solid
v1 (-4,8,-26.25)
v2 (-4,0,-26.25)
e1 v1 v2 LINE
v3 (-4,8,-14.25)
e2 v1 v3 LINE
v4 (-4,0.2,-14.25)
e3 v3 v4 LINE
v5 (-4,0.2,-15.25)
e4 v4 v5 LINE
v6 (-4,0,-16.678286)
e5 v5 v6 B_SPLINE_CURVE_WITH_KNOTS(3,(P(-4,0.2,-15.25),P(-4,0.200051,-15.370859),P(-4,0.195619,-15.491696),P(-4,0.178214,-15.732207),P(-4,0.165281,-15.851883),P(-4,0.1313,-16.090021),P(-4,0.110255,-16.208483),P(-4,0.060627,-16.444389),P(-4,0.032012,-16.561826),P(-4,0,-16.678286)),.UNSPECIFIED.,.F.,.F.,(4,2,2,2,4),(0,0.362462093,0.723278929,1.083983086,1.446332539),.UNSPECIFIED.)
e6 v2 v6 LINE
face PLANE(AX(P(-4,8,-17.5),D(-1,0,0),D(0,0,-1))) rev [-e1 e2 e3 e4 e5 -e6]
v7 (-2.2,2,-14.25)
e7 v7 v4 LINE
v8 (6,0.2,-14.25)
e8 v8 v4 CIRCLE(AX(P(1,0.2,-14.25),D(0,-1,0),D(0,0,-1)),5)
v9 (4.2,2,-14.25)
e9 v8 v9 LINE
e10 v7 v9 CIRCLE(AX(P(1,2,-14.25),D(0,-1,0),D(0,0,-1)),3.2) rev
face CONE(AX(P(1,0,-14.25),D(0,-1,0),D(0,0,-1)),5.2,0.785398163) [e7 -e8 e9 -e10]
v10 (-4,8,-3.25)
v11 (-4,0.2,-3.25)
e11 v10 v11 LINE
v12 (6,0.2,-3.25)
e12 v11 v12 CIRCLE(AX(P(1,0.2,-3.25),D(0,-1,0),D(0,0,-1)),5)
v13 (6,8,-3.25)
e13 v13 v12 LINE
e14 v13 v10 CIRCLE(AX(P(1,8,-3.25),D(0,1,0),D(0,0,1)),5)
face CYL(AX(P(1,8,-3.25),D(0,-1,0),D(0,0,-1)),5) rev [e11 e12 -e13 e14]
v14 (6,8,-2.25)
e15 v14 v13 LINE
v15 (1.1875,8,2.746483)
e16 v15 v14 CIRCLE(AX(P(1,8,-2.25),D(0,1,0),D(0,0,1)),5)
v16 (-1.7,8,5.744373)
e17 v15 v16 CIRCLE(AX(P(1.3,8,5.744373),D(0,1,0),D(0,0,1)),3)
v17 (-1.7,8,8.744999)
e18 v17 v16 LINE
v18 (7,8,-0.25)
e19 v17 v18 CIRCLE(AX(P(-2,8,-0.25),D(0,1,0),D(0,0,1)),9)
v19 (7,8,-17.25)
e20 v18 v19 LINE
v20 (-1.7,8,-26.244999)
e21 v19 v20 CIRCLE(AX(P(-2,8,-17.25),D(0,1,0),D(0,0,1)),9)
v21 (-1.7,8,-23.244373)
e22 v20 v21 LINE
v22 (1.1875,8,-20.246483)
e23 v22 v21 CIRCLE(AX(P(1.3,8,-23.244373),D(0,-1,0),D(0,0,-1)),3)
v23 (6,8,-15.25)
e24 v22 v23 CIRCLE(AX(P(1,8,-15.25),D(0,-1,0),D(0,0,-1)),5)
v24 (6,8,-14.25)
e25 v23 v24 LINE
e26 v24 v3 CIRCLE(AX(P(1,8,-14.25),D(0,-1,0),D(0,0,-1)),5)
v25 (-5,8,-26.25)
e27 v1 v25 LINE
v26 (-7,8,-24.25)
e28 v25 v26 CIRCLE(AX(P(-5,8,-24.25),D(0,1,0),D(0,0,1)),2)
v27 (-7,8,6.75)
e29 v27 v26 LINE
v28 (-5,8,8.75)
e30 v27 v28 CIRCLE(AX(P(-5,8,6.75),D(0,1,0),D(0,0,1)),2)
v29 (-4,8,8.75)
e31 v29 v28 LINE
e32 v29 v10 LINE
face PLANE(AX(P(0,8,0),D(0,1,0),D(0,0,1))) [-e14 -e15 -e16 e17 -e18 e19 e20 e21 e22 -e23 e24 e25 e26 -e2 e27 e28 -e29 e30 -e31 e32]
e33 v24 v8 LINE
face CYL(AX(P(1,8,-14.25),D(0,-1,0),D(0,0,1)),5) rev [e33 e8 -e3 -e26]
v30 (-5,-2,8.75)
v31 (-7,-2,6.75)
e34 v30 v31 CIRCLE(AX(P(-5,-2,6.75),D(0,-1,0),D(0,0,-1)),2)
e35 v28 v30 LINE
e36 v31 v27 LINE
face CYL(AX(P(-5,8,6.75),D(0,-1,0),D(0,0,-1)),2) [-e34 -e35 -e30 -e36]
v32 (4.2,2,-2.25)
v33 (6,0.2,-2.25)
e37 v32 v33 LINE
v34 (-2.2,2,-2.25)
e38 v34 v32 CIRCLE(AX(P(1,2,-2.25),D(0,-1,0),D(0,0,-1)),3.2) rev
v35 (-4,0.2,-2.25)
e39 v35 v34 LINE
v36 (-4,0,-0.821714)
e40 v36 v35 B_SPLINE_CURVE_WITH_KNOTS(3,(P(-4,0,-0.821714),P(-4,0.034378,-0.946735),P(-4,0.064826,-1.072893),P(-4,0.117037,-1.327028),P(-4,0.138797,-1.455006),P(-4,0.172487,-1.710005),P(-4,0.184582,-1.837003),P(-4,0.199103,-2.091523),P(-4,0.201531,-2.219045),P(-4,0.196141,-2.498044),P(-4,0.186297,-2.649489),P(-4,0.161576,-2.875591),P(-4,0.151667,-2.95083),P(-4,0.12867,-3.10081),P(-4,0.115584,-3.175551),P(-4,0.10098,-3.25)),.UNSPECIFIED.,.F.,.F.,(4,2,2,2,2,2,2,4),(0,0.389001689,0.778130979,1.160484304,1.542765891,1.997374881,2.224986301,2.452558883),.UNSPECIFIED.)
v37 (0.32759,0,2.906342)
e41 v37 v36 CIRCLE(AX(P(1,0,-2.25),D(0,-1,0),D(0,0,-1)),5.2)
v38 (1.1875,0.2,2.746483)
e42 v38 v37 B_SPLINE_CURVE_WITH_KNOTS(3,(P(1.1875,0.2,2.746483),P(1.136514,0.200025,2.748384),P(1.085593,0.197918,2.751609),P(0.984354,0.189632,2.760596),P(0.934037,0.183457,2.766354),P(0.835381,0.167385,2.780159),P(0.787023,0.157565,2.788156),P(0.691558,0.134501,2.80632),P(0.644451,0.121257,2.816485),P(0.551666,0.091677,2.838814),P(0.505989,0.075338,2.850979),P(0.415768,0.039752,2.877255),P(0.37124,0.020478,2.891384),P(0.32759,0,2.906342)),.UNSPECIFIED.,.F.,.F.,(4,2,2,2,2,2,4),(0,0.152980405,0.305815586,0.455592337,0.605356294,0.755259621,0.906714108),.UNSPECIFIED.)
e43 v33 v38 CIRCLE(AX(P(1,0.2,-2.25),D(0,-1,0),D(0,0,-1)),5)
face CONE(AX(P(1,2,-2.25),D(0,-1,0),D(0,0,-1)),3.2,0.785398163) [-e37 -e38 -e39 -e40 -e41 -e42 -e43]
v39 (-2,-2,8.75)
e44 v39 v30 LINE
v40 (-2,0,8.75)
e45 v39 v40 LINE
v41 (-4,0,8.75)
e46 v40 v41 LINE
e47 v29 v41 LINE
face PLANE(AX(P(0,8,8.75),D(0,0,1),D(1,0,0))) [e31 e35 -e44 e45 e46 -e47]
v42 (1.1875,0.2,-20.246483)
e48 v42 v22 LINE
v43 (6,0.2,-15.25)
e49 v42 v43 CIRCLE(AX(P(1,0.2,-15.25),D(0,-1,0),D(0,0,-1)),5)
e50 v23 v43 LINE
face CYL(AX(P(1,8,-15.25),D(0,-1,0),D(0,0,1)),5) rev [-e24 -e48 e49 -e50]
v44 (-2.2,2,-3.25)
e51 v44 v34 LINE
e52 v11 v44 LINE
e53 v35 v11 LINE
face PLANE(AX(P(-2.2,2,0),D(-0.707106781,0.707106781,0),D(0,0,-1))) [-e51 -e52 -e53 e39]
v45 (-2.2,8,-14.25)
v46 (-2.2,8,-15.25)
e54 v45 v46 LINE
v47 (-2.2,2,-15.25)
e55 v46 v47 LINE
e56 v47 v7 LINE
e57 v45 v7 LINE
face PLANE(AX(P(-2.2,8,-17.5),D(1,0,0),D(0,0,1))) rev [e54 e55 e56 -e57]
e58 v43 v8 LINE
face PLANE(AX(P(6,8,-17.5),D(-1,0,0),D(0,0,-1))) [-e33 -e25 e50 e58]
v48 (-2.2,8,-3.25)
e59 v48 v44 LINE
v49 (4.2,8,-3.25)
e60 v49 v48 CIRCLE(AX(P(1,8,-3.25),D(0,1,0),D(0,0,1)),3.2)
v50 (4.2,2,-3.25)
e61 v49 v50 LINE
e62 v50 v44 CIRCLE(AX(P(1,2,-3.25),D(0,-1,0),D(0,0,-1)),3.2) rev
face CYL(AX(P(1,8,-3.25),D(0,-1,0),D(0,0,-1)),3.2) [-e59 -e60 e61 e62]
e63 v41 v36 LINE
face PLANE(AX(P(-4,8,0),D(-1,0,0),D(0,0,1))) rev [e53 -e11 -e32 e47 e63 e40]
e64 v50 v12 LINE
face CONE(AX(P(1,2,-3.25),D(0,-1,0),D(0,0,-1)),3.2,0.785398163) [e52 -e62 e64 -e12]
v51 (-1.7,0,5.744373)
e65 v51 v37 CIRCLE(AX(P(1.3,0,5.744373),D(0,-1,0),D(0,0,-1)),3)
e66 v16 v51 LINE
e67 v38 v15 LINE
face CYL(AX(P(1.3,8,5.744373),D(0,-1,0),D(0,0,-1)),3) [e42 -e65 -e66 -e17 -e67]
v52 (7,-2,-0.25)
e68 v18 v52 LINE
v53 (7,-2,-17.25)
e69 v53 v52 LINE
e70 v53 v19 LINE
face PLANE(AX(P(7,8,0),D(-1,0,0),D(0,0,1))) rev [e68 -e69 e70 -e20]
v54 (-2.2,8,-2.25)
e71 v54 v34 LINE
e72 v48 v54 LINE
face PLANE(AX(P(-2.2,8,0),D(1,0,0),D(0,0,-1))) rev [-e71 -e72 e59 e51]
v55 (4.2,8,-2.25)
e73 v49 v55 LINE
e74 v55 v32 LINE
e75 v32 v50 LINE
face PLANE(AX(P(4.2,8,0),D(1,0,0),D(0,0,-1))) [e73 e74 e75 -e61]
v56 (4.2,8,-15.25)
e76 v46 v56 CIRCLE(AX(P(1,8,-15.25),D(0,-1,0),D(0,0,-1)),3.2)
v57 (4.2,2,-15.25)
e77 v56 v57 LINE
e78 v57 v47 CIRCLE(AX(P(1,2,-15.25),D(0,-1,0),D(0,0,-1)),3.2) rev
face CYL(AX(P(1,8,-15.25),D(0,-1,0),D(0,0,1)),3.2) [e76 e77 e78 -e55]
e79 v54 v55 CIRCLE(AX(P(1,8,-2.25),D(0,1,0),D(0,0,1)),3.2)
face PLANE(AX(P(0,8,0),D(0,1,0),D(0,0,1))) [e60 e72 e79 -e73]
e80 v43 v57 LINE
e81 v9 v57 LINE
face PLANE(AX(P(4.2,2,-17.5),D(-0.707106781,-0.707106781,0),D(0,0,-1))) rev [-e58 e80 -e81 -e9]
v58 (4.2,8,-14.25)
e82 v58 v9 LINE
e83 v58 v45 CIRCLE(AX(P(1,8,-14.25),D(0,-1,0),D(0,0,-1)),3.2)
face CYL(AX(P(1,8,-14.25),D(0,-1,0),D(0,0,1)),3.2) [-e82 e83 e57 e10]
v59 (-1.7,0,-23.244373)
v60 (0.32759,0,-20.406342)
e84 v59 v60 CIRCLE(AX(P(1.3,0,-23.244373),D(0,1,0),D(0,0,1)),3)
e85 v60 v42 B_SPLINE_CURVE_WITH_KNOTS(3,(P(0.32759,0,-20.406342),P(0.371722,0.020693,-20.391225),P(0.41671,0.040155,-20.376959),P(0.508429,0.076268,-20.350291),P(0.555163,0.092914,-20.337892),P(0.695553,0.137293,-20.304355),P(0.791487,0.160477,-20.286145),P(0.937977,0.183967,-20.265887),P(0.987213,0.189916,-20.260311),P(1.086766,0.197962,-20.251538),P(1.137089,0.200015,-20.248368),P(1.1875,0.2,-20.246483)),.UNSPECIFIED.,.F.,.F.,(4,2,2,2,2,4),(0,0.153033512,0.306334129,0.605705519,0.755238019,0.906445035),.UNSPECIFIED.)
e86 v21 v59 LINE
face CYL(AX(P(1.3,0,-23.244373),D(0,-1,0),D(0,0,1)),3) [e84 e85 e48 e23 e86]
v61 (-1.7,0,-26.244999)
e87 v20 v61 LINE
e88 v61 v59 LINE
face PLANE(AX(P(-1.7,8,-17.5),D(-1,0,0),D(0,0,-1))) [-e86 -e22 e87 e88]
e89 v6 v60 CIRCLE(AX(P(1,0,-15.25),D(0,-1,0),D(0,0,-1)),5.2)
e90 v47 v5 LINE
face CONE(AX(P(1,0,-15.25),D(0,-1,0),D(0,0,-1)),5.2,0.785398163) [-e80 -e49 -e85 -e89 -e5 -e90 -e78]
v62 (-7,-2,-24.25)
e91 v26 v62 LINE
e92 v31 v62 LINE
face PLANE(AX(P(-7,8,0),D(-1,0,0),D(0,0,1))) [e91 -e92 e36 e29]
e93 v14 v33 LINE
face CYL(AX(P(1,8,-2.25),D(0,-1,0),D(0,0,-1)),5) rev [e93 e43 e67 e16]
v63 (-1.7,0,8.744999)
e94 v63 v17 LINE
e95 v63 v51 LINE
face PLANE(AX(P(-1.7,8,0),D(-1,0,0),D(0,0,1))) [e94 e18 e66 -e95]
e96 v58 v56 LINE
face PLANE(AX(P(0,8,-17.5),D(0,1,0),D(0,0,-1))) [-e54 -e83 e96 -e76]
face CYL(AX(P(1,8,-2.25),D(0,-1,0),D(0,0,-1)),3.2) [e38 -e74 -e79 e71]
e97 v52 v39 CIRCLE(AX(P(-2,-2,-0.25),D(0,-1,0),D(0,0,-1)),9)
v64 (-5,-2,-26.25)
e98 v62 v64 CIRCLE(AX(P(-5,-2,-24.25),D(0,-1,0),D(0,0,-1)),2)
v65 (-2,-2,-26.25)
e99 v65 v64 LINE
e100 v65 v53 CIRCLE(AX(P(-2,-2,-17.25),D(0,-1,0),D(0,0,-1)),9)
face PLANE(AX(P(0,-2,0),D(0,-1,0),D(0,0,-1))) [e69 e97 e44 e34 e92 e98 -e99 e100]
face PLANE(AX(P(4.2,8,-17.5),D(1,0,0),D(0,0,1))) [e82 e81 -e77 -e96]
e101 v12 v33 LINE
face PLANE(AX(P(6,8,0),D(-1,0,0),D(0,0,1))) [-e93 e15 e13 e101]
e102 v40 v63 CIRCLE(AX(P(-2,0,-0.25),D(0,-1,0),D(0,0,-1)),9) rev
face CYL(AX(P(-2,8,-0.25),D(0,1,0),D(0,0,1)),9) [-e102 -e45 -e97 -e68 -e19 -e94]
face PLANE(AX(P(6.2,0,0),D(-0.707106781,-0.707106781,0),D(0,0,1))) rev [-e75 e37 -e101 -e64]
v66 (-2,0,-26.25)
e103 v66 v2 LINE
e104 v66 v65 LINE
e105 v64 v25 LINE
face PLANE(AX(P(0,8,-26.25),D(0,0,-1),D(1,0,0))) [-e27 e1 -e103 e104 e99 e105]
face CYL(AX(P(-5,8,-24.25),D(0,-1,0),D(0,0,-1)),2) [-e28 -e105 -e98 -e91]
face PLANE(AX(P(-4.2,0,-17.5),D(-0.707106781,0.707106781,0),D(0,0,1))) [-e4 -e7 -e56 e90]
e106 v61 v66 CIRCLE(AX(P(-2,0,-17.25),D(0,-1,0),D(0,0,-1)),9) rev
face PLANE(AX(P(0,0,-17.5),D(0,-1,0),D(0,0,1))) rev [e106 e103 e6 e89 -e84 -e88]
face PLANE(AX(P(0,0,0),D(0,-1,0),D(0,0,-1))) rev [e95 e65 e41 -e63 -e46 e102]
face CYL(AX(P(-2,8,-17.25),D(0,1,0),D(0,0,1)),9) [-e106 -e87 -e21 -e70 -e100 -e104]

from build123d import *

# Parameters (mm, degrees)
BOSS_EXTRUDE3_DEPTH   = 8
BOSS_EXTRUDE3_2_DEPTH = 8
SKETCH4_W             = 14
SKETCH4_H             = 17.5
BOSS_EXTRUDE4_DEPTH   = 2
FILLET3_R             = 3
MIRROR2_START         = -2
MIRROR2_DEPTH         = 10
MIRROR2_2_DEPTH       = 2
CHAMFER1_SIZE         = 2
FILLET4_R             = 9
FILLET5_R             = 2


# Read off the part's stored shape, not the designer's step: Mirror2
with BuildPart() as part:
    # Sketch3 → Boss-Extrude3 (new body)
    with BuildSketch(Plane(origin=(0, 0, 0), x_dir=(1, 0, 0), z_dir=(0, 1, 0))):
        with BuildLine():
            Line((-1.7, -8.75), (7, -8.75))
            Line((7, -8.75), (7, 8.75))
            Line((7, 8.75), (-7, 8.75))
            Line((-7, 8.75), (-7, -8.75))
            Line((-7, -8.75), (-4, -8.75))
            Line((-4, -8.75), (-4, 3.25))
            ThreePointArc((-4, 3.25), (1, 8.25), (6, 3.25))
            Line((6, 3.25), (6, 2.25))
            ThreePointArc((6, 2.25), (3.397915762, -2.137482194), (-1.7, -1.958325083))
            Line((-1.7, -1.958325083), (-1.7, -8.75))
        make_face()
    extrude(amount=BOSS_EXTRUDE3_DEPTH)



with BuildPart() as body_2:
    # Sketch3 → Boss-Extrude3 2 (new body)
    with BuildSketch(Plane(origin=(0, 0, 0), x_dir=(1, 0, 0), z_dir=(0, 1, 0))):
        with BuildLine():
            ThreePointArc((-2.2, 2.25), (1, -0.95), (4.2, 2.25))
            Line((4.2, 2.25), (4.2, 3.25))
            ThreePointArc((4.2, 3.25), (1, 6.45), (-2.2, 3.25))
            Line((-2.2, 3.25), (-2.2, 2.25))
        make_face()
    extrude(amount=BOSS_EXTRUDE3_2_DEPTH)


with BuildPart() as part_1:
    add(part.part)

    add(body_2.part)  # Boss-Extrude4 merges body 2
    # Sketch4 → Boss-Extrude4 (add)
    with BuildSketch(Plane(origin=(0, 0, 0), x_dir=(-1, 0, 0), z_dir=(0, -1, 0))):
        Rectangle(SKETCH4_W, SKETCH4_H)
    extrude(amount=BOSS_EXTRUDE4_DEPTH)

    # Fillet3
    fillet3_edges = [part_1.edges().sort_by_distance(p)[0] for p in [
        (-1.7, 4, 1.958325083),
    ]]
    fillet(fillet3_edges, radius=FILLET3_R)

    # Mirror2 outline → Mirror2 (add)
    with BuildSketch(Plane(origin=(0, 0, 0), x_dir=(1, 0, 0), z_dir=(0, 1, 0)).offset(MIRROR2_START)):
        with BuildLine():
            ThreePointArc((1.1875, 20.246483138), (4.601215073, 18.718609231), (6, 15.25))
            Line((6, 15.25), (6, 14.25))
            ThreePointArc((6, 14.25), (1, 9.25), (-4, 14.25))
            Line((-4, 14.25), (-4, 26.25))
            Line((-4, 26.25), (-7, 26.25))
            Line((-7, 26.25), (-7, 8.75))
            Line((-7, 8.75), (7, 8.75))
            Line((7, 8.75), (7, 26.25))
            Line((7, 26.25), (-1.7, 26.25))
            Line((-1.7, 26.25), (-1.7, 23.244373021))
            ThreePointArc((-1.7, 23.244373021), (-0.860729044, 21.163207482), (1.1875, 20.246483138))
        make_face()
        with BuildLine():
            ThreePointArc((-2.2, 14.25), (1, 11.05), (4.2, 14.25))
            Line((4.2, 14.25), (4.2, 15.25))
            ThreePointArc((4.2, 15.25), (1, 18.45), (-2.2, 15.25))
            Line((-2.2, 15.25), (-2.2, 14.25))
        make_face()
    extrude(amount=MIRROR2_DEPTH)

    # Mirror2 2 outline → Mirror2 2 (add)
    with BuildSketch(Plane(origin=(0, 0, 0), x_dir=(1, 0, 0), z_dir=(0, 1, 0)).offset(MIRROR2_START)):
        with BuildLine():
            Line((6, 14.25), (6, 15.25))
            ThreePointArc((6, 15.25), (4.601215073, 18.718609231), (1.1875, 20.246483138))
            ThreePointArc((1.1875, 20.246483138), (-0.860729044, 21.163207482), (-1.7, 23.244373021))
            Line((-1.7, 23.244373021), (-1.7, 26.25))
            Line((-1.7, 26.25), (-4, 26.25))
            Line((-4, 26.25), (-4, 14.25))
            ThreePointArc((-4, 14.25), (1, 9.25), (6, 14.25))
        make_face()
        with BuildLine():
            Line((4.2, 15.25), (4.2, 14.25))
            ThreePointArc((4.2, 14.25), (1, 11.05), (-2.2, 14.25))
            Line((-2.2, 14.25), (-2.2, 15.25))
            ThreePointArc((-2.2, 15.25), (1, 18.45), (4.2, 15.25))
        make_face(mode=Mode.SUBTRACT)
    extrude(amount=MIRROR2_2_DEPTH)

    # Chamfer1
    # the kernel refuses this chamfer: 2 mm, written as the material it adds along each edge
    with BuildSketch(Plane(origin=(1, 0, -14.25), x_dir=(1, 0, 0), z_dir=(0, 0, -1))) as chamfer1_piece_1:
        Polygon((3.2 + CHAMFER1_SIZE, 0), (3.2, -CHAMFER1_SIZE), (3.2, 0), align=None)
    revolve(axis=Axis((1, 0, -14.25), (0, -1, 0)), revolution_arc=180)
    with BuildSketch(Plane(origin=(-2.2, 0, -14.25), x_dir=(-0.9996219169112968, -0.027495876610586365, 0), z_dir=(0, 0, -1)), Plane(origin=(4.2, 0, -15.25), x_dir=(0.9996219169112968, -0.027495876610586365, 0), z_dir=(0, 0, 1))) as chamfer1_piece_2:
        Polygon((CHAMFER1_SIZE * 0.999621916911, CHAMFER1_SIZE * 0.0274958766106), (-CHAMFER1_SIZE * 0.0274958766106, CHAMFER1_SIZE * 0.999621916911), (0, 0), align=None)
    extrude(amount=1)
    with BuildSketch(Plane(origin=(1, 0, -15.25), x_dir=(-1, 0, 0), z_dir=(0, 0, 1))) as chamfer1_piece_3:
        Polygon((3.2 + CHAMFER1_SIZE, 0), (3.2, -CHAMFER1_SIZE), (3.2, 0), align=None)
    revolve(axis=Axis((1, 0, -15.25), (0, -1, 0)), revolution_arc=180)
    with BuildSketch(Plane(origin=(1, 0, -3.25), x_dir=(1, 0, 0), z_dir=(0, 0, 1))) as chamfer1_piece_4:
        Polygon((3.2 + CHAMFER1_SIZE, 0), (3.2, CHAMFER1_SIZE), (3.2, 0), align=None)
    revolve(axis=Axis((1, 0, -3.25), (0, 1, 0)), revolution_arc=180)
    with BuildSketch(Plane(origin=(-2.2, 0, -3.25), x_dir=(-0.9996219169112968, -0.027495876610586365, 0), z_dir=(0, 0, 1)), Plane(origin=(4.2, 0, -2.25), x_dir=(0.9996219169112968, -0.027495876610586365, 0), z_dir=(0, 0, -1))) as chamfer1_piece_5:
        Polygon((CHAMFER1_SIZE * 0.999621916911, -CHAMFER1_SIZE * 0.0274958766106), (-CHAMFER1_SIZE * 0.0274958766106, -CHAMFER1_SIZE * 0.999621916911), (0, 0), align=None)
    extrude(amount=1)
    with BuildSketch(Plane(origin=(1, 0, -2.25), x_dir=(-1, 0, 0), z_dir=(0, 0, -1))) as chamfer1_piece_6:
        Polygon((3.2 + CHAMFER1_SIZE, 0), (3.2, CHAMFER1_SIZE), (3.2, 0), align=None)
    revolve(axis=Axis((1, 0, -2.25), (0, 1, 0)), revolution_arc=180)

    # Fillet4
    fillet4_edges = [part_1.edges().sort_by_distance(p)[0] for p in [
        (7, 3, 8.75),
        (7, 3, -26.25),
    ]]
    fillet(fillet4_edges, radius=FILLET4_R)

    # Fillet5
    fillet5_edges = [part_1.edges().sort_by_distance(p)[0] for p in [
        (-7, 3, 8.75),
        (-7, 3, -26.25),
    ]]
    fillet(fillet5_edges, radius=FILLET5_R)


solid = part_1.part
